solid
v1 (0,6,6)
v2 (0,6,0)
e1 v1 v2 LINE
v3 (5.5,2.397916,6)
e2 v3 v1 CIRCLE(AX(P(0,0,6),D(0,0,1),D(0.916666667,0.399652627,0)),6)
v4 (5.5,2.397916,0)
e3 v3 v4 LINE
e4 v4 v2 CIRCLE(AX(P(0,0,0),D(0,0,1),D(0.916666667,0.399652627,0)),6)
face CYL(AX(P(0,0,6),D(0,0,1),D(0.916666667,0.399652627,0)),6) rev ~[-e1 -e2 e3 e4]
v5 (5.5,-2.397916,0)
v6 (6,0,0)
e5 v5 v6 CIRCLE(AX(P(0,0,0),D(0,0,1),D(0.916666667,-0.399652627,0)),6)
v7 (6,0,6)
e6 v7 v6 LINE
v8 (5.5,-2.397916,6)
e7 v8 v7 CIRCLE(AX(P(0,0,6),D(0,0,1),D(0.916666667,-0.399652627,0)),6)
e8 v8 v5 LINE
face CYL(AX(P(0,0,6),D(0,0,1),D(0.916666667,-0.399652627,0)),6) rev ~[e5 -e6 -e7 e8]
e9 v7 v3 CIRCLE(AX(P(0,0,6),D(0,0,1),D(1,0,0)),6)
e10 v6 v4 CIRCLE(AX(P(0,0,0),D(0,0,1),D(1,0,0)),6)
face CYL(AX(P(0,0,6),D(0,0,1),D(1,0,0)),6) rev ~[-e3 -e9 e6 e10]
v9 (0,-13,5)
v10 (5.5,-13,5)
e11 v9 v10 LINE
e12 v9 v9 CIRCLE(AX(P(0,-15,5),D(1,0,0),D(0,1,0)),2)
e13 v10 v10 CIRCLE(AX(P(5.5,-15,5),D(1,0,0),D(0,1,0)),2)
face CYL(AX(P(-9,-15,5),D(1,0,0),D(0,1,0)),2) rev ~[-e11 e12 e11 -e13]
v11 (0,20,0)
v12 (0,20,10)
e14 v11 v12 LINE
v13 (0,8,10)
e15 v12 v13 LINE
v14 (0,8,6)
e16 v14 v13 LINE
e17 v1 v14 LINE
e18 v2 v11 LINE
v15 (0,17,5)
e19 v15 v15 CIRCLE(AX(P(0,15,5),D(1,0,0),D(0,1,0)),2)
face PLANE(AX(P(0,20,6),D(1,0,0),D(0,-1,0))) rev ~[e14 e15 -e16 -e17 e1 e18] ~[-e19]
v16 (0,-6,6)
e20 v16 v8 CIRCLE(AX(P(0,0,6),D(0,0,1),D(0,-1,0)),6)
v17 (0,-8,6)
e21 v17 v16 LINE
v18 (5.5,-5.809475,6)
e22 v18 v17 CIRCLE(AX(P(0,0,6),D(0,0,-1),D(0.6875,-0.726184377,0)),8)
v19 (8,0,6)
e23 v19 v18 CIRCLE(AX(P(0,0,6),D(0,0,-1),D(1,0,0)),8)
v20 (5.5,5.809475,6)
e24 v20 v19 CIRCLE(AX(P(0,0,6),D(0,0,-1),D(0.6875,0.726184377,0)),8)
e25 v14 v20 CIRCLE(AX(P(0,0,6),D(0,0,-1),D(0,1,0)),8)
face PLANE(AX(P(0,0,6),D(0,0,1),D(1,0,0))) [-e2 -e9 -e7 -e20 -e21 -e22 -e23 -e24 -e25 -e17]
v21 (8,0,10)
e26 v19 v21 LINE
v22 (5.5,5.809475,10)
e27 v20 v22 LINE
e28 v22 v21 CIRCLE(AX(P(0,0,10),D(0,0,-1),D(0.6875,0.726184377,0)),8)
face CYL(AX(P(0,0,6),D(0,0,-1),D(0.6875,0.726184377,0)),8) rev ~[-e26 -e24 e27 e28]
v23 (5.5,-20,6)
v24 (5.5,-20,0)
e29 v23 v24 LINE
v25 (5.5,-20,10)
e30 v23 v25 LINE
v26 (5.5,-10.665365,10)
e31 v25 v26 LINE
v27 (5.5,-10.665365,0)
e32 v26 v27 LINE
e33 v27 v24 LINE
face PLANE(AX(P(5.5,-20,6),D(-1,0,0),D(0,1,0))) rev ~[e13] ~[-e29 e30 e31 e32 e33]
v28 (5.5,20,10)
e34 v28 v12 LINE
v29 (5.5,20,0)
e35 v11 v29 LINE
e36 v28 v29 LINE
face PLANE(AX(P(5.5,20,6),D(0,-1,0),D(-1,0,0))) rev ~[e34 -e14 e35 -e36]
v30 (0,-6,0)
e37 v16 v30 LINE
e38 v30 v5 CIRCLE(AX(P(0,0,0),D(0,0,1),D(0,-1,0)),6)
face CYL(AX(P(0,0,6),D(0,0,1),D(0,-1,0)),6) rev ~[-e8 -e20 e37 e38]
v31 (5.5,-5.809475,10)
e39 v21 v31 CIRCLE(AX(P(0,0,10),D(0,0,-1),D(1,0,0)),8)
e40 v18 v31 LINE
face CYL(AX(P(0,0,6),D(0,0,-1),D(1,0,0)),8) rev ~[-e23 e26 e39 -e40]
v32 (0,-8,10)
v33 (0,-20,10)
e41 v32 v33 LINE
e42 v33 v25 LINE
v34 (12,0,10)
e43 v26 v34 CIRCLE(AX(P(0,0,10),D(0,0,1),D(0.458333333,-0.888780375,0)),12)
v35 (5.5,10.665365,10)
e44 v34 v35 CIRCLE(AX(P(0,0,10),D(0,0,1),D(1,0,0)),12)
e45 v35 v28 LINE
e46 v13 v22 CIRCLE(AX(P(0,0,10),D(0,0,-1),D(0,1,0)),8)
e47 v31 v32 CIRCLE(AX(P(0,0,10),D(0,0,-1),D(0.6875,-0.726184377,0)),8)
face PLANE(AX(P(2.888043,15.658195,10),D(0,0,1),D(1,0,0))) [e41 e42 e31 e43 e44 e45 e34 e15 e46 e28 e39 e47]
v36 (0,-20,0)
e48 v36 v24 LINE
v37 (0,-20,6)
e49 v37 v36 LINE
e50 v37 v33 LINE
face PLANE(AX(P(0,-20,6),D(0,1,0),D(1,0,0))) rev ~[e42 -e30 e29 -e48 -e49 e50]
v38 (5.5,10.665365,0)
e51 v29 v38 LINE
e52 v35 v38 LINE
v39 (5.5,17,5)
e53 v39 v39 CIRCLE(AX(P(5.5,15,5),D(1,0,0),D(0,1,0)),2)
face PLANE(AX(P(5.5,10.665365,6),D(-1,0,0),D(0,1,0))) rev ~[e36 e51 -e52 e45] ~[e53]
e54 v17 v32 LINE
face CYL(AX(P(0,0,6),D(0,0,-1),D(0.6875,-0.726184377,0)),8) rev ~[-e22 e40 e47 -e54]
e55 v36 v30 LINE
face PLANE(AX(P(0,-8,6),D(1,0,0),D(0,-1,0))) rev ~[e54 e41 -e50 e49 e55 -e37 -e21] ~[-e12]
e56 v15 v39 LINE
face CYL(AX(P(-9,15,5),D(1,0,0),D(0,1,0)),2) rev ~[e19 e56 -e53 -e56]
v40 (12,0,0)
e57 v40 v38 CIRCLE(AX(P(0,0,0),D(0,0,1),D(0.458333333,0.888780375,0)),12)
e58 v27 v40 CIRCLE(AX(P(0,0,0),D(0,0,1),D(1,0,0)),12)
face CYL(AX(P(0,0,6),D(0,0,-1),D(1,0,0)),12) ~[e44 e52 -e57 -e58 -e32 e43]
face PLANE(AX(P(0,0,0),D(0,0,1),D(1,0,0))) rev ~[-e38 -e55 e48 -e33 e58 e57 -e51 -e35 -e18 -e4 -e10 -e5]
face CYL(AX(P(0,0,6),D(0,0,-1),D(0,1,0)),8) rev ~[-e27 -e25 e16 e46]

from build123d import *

# Parameters (mm, degrees)
F1_DEPTH = 10
F3_DEPTH = 4
F4_W     = 5.5
F4_H     = 11.188021542
F4_H_2   = 22.7246312633
F4_H_3   = 10.0103956625
F5_DEPTH = 25
F6_DEPTH = 4
F8_D     = 4
F8_DEPTH = 9
F8_TIP   = 1.2017212381


# Not quite as in the source:
# - a feature names something its author has since deleted; it is built from what else it names


with BuildPart() as f1:
    # F0 (on Top) → F1 (new body)
    with BuildSketch(Plane.XY):
        Polygon((60, 11.5470053838), (40, 46.1880215352), (-40, 46.1880215352), (-60, 11.5470053838), (-20, -57.735026919), (20, -57.735026919), align=None)
    extrude(amount=F1_DEPTH)

    # F2 (on face) → F3 (cut)
    with BuildSketch(Plane.XY.offset(10)):
        Polygon((-42.8867513499, 31.188021542), (-48.4529946241, 21.5470053838), (-5.5662432742, -52.7350269258), (5.5662432742, -52.7350269258), (48.4529946241, 21.5470053838), (42.8867513499, 31.188021542), align=None)
    extrude(amount=-F3_DEPTH, mode=Mode.SUBTRACT)

    # F4 (on face) + F1_face (on face) → F5 (cut)
    with BuildSketch(Plane.XY.offset(6)):
        with BuildLine():
            ThreePointArc((-5.5, -10.6653645039), (-12, 0), (-5.5, 10.6653645039))
            Line((-5.5, 10.6653645039), (-5.5, 20))
            Line((-5.5, 20), (-5.5, 31.188021542))
            Line((-5.5, 31.188021542), (-42.8867513499, 31.188021542))
            Line((-42.8867513499, 31.188021542), (-48.4529946241, 21.5470053838))
            Line((-48.4529946241, 21.5470053838), (-11.3457479046, -42.7246312633))
            Line((-11.3457479046, -42.7246312633), (-5.5, -42.7246312633))
            Line((-5.5, -42.7246312633), (-5.5, -20))
            Line((-5.5, -20), (-5.5, -10.6653645039))
        make_face()
        with Locations((2.75, 25.594010771)):
            Rectangle(F4_W, F4_H)
        with Locations((-2.75, 25.594010771)):
            Rectangle(F4_W, F4_H)
        with BuildLine():
            ThreePointArc((-5.5, 10.6653645039), (-2.8298079399, 11.6615688063), (0, 12))
            Line((0, 12), (0, 20))
            Line((0, 20), (-5.5, 20))
            Line((-5.5, 20), (-5.5, 10.6653645039))
        make_face()
        with BuildLine():
            ThreePointArc((-5.5, 5.8094750193), (-2.9600844452, 7.4322204002), (0, 8))
            Line((0, 8), (0, 12))
            ThreePointArc((0, 12), (-2.8298079399, 11.6615688063), (-5.5, 10.6653645039))
            Line((-5.5, 10.6653645039), (-5.5, 5.8094750193))
        make_face()
        with BuildLine():
            ThreePointArc((-5.5, 2.3979157617), (-3.2872865277, 5.0193373352), (0, 6))
            Line((0, 6), (0, 8))
            ThreePointArc((0, 8), (-2.9600844452, 7.4322204002), (-5.5, 5.8094750193))
            Line((-5.5, 5.8094750193), (-5.5, 2.3979157617))
        make_face()
        with BuildLine():
            Line((5.5, -2.3979157617), (5.5, 2.3979157617))
            ThreePointArc((5.5, 2.3979157617), (3.2872865277, 5.0193373352), (0, 6))
            ThreePointArc((0, 6), (-3.2872865277, 5.0193373352), (-5.5, 2.3979157617))
            Line((-5.5, 2.3979157617), (-5.5, -2.3979157617))
            ThreePointArc((-5.5, -2.3979157617), (-3.2872865277, -5.0193373352), (0, -6))
            ThreePointArc((0, -6), (3.2872865277, -5.0193373352), (5.5, -2.3979157617))
        make_face()
        with BuildLine():
            ThreePointArc((-5.5, -2.3979157617), (-6, 0), (-5.5, 2.3979157617))
            Line((-5.5, 2.3979157617), (-5.5, 5.8094750193))
            ThreePointArc((-5.5, 5.8094750193), (-8, 0), (-5.5, -5.8094750193))
            Line((-5.5, -5.8094750193), (-5.5, -2.3979157617))
        make_face()
        with BuildLine():
            ThreePointArc((-5.5, -5.8094750193), (-8, 0), (-5.5, 5.8094750193))
            Line((-5.5, 5.8094750193), (-5.5, 10.6653645039))
            ThreePointArc((-5.5, 10.6653645039), (-12, 0), (-5.5, -10.6653645039))
            Line((-5.5, -10.6653645039), (-5.5, -5.8094750193))
        make_face()
        with BuildLine():
            Line((-5.5, -2.3979157617), (-5.5, 2.3979157617))
            ThreePointArc((-5.5, 2.3979157617), (-6, 0), (-5.5, -2.3979157617))
        make_face()
        with BuildLine():
            Line((0, -8), (0, -6))
            ThreePointArc((0, -6), (-3.2872865277, -5.0193373352), (-5.5, -2.3979157617))
            Line((-5.5, -2.3979157617), (-5.5, -5.8094750193))
            ThreePointArc((-5.5, -5.8094750193), (-2.9600844452, -7.4322204002), (0, -8))
        make_face()
        with BuildLine():
            Line((0, -12), (0, -8))
            ThreePointArc((0, -8), (-2.9600844452, -7.4322204002), (-5.5, -5.8094750193))
            Line((-5.5, -5.8094750193), (-5.5, -10.6653645039))
            ThreePointArc((-5.5, -10.6653645039), (-2.8298079399, -11.6615688063), (0, -12))
        make_face()
        with BuildLine():
            Line((0, -20), (0, -12))
            ThreePointArc((0, -12), (-2.8298079399, -11.6615688063), (-5.5, -10.6653645039))
            Line((-5.5, -10.6653645039), (-5.5, -20))
            Line((-5.5, -20), (0, -20))
        make_face()
        with Locations((-2.75, -31.3623156317)):
            Rectangle(F4_W, F4_H_2)
        with Locations((2.75, -31.3623156317)):
            Rectangle(F4_W, F4_H_2)
        with BuildLine():
            Line((5.5, 20), (5.5, 10.6653645039))
            ThreePointArc((5.5, 10.6653645039), (10.246950766, 6.2449979984), (12, 0))
            ThreePointArc((12, 0), (10.246950766, -6.2449979984), (5.5, -10.6653645039))
            Line((5.5, -10.6653645039), (5.5, -20))
            Line((5.5, -20), (5.5, -42.7246312633))
            Line((5.5, -42.7246312633), (11.3457479046, -42.7246312633))
            Line((11.3457479046, -42.7246312633), (48.4529946241, 21.5470053838))
            Line((48.4529946241, 21.5470053838), (42.8867513499, 31.188021542))
            Line((42.8867513499, 31.188021542), (5.5, 31.188021542))
            Line((5.5, 31.188021542), (5.5, 20))
        make_face()
        Polygon((11.3457479046, -42.7246312633), (5.5, -42.7246312633), (5.5, -52.7350269258), (5.5662432742, -52.7350269258), align=None)
        with Locations((2.75, -47.7298290946)):
            Rectangle(F4_W, F4_H_3)
        with Locations((-2.75, -47.7298290946)):
            Rectangle(F4_W, F4_H_3)
        Polygon((-5.5, -52.7350269258), (-5.5, -42.7246312633), (-11.3457479046, -42.7246312633), (-5.5662432742, -52.7350269258), align=None)
        with BuildLine():
            ThreePointArc((5.5, -2.3979157617), (5.8736700622, -1.2247448714), (6, 0))
            ThreePointArc((6, 0), (5.8736700622, 1.2247448714), (5.5, 2.3979157617))
            Line((5.5, 2.3979157617), (5.5, -2.3979157617))
        make_face()
    with BuildSketch(Plane.XY.offset(10)):
        Polygon((60, 11.5470053838), (40, 46.1880215352), (-40, 46.1880215352), (-60, 11.5470053838), (-20, -57.735026919), (20, -57.735026919), align=None)
        Polygon((-48.4529946241, 21.5470053838), (-42.8867513499, 31.188021542), (42.8867513499, 31.188021542), (48.4529946241, 21.5470053838), (5.5662432742, -52.7350269258), (-5.5662432742, -52.7350269258), align=None, mode=Mode.SUBTRACT)
    extrude(amount=-F5_DEPTH, mode=Mode.SUBTRACT)

    # F4 (on face) → F6 (join)
    with BuildSketch(Plane.XY.offset(6)):
        with BuildLine():
            ThreePointArc((0, 12), (2.8298079399, 11.6615688063), (5.5, 10.6653645039))
            Line((5.5, 10.6653645039), (5.5, 20))
            Line((5.5, 20), (0, 20))
            Line((0, 20), (0, 12))
        make_face()
        with BuildLine():
            ThreePointArc((0, 8), (2.9600844452, 7.4322204002), (5.5, 5.8094750193))
            Line((5.5, 5.8094750193), (5.5, 10.6653645039))
            ThreePointArc((5.5, 10.6653645039), (2.8298079399, 11.6615688063), (0, 12))
            Line((0, 12), (0, 8))
        make_face()
        with BuildLine():
            Line((5.5, 10.6653645039), (5.5, 5.8094750193))
            ThreePointArc((5.5, 5.8094750193), (7.3484692283, 3.1622776602), (8, 0))
            ThreePointArc((8, 0), (7.3484692283, -3.1622776602), (5.5, -5.8094750193))
            Line((5.5, -5.8094750193), (5.5, -10.6653645039))
            ThreePointArc((5.5, -10.6653645039), (10.246950766, -6.2449979984), (12, 0))
            ThreePointArc((12, 0), (10.246950766, 6.2449979984), (5.5, 10.6653645039))
        make_face()
        with BuildLine():
            Line((5.5, -10.6653645039), (5.5, -5.8094750193))
            ThreePointArc((5.5, -5.8094750193), (2.9600844452, -7.4322204002), (0, -8))
            Line((0, -8), (0, -12))
            ThreePointArc((0, -12), (2.8298079399, -11.6615688063), (5.5, -10.6653645039))
        make_face()
        with BuildLine():
            Line((5.5, -20), (5.5, -10.6653645039))
            ThreePointArc((5.5, -10.6653645039), (2.8298079399, -11.6615688063), (0, -12))
            Line((0, -12), (0, -20))
            Line((0, -20), (5.5, -20))
        make_face()
    extrude(amount=F6_DEPTH)

    # F8
    with Locations(Plane(origin=(0, 0, 0), x_dir=(0, -1, 0), z_dir=(-1, 0, 0))):
        with Locations((15, 5), (-15, 5)):
            Hole(F8_D / 2, depth=F8_DEPTH)
            with Locations((0, 0, -(F8_DEPTH + F8_TIP / 2))):  # 118° drill point
                Cone(0, F8_D / 2, F8_TIP, mode=Mode.SUBTRACT)


solid = f1.part
